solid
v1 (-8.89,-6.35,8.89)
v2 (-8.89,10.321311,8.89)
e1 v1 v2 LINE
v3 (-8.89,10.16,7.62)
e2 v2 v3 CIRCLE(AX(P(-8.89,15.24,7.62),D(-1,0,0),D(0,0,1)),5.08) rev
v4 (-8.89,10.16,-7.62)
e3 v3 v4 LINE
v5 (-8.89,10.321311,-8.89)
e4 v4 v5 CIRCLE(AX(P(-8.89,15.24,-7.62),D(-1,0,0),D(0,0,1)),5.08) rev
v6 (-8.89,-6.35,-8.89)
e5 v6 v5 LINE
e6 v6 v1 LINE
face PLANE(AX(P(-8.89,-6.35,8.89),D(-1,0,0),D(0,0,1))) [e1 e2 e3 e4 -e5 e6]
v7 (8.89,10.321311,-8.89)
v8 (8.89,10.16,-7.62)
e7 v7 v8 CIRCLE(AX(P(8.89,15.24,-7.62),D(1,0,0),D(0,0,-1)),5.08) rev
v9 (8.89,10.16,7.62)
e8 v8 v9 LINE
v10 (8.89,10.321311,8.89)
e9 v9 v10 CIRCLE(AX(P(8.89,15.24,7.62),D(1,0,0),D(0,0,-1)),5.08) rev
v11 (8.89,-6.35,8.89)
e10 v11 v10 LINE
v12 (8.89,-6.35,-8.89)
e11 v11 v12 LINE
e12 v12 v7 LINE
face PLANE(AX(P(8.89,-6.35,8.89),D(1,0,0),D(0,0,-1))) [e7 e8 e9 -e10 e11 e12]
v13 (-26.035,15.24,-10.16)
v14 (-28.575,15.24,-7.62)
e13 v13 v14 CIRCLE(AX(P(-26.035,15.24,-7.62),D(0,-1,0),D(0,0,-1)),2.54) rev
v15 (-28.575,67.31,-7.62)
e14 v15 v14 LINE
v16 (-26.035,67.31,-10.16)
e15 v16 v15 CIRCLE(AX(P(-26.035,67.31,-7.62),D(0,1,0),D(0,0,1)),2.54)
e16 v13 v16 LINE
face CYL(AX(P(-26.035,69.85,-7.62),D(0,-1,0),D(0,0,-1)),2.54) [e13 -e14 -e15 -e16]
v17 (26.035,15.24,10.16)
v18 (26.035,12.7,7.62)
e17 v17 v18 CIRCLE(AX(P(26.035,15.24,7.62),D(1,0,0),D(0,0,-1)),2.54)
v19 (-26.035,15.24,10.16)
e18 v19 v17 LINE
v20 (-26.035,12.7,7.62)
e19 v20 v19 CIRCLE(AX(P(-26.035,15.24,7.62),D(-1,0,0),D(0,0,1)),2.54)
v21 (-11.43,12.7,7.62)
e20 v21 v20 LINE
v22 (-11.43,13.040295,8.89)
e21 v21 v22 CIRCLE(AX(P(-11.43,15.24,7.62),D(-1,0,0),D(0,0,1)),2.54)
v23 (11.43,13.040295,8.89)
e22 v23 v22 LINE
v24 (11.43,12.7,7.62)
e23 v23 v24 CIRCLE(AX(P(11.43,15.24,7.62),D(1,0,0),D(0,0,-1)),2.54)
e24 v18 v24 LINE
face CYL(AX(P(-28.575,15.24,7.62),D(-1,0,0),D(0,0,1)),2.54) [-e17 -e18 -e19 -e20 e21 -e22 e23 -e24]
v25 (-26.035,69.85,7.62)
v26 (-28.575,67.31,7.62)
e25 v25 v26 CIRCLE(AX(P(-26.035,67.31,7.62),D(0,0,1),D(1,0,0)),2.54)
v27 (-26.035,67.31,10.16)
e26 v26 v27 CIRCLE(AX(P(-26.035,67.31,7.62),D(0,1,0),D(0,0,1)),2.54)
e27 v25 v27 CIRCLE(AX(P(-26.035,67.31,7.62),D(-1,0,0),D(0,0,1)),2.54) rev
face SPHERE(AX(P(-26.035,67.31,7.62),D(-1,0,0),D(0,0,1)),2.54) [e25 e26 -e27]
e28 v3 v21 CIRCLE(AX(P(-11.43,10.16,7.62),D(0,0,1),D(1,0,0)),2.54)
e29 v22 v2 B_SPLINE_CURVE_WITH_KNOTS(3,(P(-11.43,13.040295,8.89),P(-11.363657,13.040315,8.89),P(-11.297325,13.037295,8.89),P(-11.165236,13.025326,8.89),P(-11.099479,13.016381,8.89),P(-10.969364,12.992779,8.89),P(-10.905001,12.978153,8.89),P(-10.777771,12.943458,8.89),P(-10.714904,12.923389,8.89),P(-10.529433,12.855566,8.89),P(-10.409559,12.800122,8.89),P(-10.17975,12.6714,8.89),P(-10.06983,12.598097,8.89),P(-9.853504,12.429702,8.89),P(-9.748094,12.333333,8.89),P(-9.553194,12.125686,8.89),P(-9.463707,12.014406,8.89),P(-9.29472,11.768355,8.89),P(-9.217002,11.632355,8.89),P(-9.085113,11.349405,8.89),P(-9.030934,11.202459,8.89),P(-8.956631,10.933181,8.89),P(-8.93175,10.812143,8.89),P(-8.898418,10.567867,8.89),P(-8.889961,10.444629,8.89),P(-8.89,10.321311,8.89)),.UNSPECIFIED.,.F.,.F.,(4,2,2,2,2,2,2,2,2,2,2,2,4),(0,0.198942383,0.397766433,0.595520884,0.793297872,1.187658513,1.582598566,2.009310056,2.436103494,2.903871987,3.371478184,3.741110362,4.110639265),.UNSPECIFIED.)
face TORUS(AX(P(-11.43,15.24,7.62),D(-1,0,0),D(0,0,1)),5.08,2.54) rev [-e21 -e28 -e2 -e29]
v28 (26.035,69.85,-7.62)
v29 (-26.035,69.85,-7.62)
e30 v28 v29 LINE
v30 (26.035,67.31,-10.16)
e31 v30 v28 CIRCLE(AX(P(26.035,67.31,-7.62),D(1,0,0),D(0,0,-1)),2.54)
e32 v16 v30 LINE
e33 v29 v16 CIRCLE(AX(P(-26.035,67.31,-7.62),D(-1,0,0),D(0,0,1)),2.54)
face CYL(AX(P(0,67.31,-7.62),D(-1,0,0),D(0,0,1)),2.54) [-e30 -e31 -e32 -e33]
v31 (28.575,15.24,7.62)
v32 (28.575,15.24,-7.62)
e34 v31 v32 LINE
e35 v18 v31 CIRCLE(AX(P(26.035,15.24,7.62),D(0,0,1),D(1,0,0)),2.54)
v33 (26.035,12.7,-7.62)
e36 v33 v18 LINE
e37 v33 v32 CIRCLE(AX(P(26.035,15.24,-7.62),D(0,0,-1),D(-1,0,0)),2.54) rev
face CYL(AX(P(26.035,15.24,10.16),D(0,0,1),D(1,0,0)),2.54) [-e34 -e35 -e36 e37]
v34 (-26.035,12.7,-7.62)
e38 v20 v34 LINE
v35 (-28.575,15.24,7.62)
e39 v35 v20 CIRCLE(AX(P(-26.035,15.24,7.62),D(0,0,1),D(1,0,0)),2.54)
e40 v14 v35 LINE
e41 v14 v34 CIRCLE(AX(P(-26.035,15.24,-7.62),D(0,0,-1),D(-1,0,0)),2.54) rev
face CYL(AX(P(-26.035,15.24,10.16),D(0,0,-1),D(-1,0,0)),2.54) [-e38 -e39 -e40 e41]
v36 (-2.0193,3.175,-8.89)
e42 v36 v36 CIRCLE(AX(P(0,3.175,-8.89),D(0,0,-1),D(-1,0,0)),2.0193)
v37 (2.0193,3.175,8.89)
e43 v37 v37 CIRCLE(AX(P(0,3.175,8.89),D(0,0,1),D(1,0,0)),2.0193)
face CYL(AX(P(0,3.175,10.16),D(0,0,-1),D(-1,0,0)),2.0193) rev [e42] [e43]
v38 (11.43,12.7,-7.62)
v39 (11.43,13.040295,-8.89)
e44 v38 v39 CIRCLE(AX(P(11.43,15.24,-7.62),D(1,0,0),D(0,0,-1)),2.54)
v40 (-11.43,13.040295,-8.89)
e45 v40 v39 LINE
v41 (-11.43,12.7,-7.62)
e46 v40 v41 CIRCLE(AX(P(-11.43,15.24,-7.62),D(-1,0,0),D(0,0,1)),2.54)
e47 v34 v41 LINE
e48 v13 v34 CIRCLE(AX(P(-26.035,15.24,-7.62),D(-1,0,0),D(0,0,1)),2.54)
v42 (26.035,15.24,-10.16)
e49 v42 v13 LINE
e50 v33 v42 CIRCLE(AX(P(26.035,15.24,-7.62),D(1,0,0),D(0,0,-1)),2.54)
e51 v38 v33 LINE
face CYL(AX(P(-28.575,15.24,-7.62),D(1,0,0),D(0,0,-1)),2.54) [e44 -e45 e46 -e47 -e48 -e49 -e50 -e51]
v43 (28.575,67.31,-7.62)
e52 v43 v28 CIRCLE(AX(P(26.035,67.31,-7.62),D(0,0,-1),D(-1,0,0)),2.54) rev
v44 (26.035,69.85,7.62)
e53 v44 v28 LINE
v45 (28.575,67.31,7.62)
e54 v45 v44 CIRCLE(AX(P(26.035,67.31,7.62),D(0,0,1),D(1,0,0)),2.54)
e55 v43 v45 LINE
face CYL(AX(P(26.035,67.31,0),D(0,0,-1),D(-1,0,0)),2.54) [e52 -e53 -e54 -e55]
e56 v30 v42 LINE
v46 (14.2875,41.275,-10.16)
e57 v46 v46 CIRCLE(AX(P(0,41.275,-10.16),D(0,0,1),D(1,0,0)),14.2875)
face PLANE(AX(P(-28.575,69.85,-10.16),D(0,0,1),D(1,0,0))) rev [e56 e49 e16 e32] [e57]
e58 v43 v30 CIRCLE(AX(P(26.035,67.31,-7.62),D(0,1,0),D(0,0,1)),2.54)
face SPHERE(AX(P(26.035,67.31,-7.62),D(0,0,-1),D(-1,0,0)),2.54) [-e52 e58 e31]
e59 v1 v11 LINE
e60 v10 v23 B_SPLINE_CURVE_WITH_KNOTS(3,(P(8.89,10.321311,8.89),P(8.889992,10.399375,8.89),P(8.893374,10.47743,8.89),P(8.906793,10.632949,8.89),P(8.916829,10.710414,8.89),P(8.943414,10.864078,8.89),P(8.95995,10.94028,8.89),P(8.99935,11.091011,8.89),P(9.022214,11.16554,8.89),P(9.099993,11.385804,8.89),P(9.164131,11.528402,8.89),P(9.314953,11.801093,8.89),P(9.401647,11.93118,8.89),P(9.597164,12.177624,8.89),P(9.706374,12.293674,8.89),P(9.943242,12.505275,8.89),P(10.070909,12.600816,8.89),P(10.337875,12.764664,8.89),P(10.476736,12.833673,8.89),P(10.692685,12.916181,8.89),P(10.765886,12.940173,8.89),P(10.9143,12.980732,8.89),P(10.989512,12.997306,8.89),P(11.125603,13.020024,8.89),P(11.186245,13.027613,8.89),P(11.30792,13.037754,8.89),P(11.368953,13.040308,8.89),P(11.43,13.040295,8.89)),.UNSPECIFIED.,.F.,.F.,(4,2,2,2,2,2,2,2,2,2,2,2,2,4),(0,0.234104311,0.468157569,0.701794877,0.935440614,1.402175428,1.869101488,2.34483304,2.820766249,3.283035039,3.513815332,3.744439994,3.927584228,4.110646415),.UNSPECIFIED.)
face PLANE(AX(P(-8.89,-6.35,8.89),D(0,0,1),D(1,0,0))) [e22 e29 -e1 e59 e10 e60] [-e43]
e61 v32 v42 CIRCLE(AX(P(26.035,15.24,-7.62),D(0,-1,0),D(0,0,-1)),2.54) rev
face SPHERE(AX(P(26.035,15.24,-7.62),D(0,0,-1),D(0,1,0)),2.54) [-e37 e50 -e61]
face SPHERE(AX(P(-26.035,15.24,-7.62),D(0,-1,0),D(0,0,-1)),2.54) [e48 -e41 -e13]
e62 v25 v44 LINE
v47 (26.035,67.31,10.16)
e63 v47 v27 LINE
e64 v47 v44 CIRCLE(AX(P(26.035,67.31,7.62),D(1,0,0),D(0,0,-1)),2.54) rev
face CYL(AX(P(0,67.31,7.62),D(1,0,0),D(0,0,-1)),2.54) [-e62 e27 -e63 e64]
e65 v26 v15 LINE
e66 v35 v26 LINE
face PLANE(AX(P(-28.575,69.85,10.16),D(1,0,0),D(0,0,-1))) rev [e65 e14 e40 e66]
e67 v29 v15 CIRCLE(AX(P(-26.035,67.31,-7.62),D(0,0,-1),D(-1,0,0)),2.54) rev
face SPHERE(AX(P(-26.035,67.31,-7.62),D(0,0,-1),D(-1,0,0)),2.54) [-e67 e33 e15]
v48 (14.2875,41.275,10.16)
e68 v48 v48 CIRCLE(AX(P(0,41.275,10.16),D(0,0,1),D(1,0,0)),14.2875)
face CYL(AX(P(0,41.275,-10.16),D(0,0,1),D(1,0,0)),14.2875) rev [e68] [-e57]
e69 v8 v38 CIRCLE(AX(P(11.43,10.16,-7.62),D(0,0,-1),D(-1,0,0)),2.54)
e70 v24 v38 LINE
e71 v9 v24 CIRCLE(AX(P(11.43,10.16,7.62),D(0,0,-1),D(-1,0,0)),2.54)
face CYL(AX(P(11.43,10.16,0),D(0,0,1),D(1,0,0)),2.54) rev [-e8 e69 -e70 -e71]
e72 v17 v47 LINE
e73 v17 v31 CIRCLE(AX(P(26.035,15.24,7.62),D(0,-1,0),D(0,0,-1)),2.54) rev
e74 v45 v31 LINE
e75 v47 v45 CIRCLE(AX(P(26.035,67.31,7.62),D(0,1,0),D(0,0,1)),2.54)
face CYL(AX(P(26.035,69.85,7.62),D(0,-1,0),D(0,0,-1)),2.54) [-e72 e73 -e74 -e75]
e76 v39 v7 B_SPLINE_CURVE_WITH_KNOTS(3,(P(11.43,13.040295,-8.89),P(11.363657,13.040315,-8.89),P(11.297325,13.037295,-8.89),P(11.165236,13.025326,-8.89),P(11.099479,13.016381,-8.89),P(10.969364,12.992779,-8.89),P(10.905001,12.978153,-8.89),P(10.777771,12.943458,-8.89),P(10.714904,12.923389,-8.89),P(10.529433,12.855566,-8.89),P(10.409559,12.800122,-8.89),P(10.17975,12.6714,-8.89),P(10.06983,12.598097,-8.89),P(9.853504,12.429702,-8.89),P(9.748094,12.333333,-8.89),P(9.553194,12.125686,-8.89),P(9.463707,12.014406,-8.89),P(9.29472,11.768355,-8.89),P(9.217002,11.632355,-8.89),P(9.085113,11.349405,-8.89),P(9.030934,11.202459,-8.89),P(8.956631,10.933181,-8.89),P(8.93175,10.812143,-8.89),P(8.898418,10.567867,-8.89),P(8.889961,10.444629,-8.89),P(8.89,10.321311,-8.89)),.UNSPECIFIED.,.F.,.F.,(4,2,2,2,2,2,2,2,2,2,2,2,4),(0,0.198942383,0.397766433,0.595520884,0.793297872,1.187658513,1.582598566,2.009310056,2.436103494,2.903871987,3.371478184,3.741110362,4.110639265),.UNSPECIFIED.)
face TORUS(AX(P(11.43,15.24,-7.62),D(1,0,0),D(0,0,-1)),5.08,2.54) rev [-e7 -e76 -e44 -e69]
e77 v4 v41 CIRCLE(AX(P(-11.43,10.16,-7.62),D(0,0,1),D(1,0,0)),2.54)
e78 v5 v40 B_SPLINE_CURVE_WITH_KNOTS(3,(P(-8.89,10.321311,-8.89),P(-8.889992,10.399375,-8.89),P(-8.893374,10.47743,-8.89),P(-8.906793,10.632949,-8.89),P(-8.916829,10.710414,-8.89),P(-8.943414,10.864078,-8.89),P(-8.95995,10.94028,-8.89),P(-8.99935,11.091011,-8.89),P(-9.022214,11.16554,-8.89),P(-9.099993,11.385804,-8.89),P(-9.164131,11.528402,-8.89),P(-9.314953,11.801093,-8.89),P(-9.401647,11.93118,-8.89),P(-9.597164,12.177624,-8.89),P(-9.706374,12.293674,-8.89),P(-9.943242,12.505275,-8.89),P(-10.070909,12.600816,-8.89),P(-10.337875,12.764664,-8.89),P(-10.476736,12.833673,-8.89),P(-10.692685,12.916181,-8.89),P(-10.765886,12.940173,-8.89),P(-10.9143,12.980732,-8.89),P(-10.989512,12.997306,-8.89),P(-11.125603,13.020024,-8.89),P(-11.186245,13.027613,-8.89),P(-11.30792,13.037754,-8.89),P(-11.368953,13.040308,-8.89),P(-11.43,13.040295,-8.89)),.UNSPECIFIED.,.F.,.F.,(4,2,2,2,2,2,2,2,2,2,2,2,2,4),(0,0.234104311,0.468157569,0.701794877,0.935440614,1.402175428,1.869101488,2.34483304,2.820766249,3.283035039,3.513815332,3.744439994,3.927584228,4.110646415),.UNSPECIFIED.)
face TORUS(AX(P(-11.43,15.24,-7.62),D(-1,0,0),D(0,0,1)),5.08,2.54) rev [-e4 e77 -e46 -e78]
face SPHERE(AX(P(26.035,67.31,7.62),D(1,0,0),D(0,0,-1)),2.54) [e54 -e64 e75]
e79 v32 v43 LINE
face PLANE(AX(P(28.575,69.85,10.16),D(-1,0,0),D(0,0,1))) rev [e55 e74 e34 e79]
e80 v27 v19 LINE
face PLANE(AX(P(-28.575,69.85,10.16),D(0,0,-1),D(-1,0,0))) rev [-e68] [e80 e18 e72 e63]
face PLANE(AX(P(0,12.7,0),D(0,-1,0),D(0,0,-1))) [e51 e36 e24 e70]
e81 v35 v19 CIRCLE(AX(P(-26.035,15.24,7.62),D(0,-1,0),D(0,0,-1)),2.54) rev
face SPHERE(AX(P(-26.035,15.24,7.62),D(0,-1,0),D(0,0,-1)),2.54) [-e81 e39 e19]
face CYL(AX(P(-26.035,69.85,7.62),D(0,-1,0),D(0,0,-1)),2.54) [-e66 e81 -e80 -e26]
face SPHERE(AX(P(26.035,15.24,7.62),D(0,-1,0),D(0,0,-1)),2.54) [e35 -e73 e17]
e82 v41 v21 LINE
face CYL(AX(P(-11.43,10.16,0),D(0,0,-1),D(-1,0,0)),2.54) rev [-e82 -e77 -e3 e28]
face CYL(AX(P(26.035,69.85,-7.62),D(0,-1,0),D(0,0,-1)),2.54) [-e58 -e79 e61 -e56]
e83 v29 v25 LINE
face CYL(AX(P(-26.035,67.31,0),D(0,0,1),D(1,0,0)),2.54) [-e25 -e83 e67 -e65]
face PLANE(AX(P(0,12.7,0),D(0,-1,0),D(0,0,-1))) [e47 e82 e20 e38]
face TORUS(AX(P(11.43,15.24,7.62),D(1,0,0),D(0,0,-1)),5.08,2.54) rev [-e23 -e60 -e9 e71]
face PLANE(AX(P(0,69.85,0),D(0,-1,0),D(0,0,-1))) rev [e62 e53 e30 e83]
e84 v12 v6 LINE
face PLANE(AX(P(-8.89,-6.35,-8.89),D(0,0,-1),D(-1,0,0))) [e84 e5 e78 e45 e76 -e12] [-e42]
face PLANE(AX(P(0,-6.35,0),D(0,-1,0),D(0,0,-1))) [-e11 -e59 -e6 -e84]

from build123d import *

# Parameters (mm, degrees)
BOSS_EXTRUDE1_DEPTH      = 12.7
BOSS_EXTRUDE1_DEPTH_BACK = 6.35
SKETCH1_W                = 17.78
SKETCH1_H                = 17.78
SKETCH2_W                = 57.15
SKETCH2_H                = 20.32
BOSS_EXTRUDE2_DEPTH      = 57.15
SKETCH3_R                = 14.2875
CUT_EXTRUDE1_DEPTH       = 79.156608966
FILLET1_R                = 2.54
SKETCH4_R                = 2.0193
CUT_EXTRUDE2_DEPTH       = 78.836081768
FILLET2_R                = 2.54


with BuildPart() as part:
    # Sketch1 → Boss-Extrude1 (new, two sides: drawn at the far end of the back side and taken through both)
    with BuildSketch(Plane(origin=(0, 0, 0), x_dir=(1, 0, 0), z_dir=(0, 1, 0)).offset(-BOSS_EXTRUDE1_DEPTH_BACK)):
        Rectangle(SKETCH1_W, SKETCH1_H)
    extrude(amount=BOSS_EXTRUDE1_DEPTH + BOSS_EXTRUDE1_DEPTH_BACK)

    # Sketch2 → Boss-Extrude2 (add)
    with BuildSketch(Plane(origin=(0, 12.7, 0), x_dir=(1, 0, 0), z_dir=(0, 1, 0))):
        Rectangle(SKETCH2_W, SKETCH2_H)
    extrude(amount=BOSS_EXTRUDE2_DEPTH)

    # Sketch3 → Cut-Extrude1 (cut, through all)
    with BuildSketch(Plane.XY.offset(10.16)):
        with Locations((0, 41.275)):
            Circle(SKETCH3_R)
    extrude(amount=-CUT_EXTRUDE1_DEPTH, mode=Mode.SUBTRACT)

    # Fillet1
    # the kernel refuses this fillet: 2.54 mm, written as the material it takes off along each edge
    with BuildSketch(Plane(origin=(26.035, 67.31, 7.62), x_dir=(0, 1, 0), z_dir=(0, 0, 1))) as fillet1_piece_1_section:
        Polygon((0, 0), (FILLET1_R, 0), (FILLET1_R, -FILLET1_R), (0, -FILLET1_R), align=None)
    fillet1_piece_1 = extrude(amount=FILLET1_R, mode=Mode.PRIVATE)
    fillet1_piece_1 = fillet1_piece_1 - Plane(origin=(26.035, 67.31, 7.62), x_dir=(-0.7071067811865475, -0.7071067811865475, 0), z_dir=(0, 0, 1)) * Sphere(FILLET1_R, mode=Mode.PRIVATE)
    add(fillet1_piece_1, mode=Mode.SUBTRACT)
    with BuildSketch(Plane(origin=(26.035, 67.31, -7.62), x_dir=(1, 0, 0), z_dir=(0, 1, 0))) as fillet1_piece_2_section:
        Polygon((0, 0), (FILLET1_R, 0), (FILLET1_R, FILLET1_R), (0, FILLET1_R), align=None)
    fillet1_piece_2 = extrude(amount=FILLET1_R, mode=Mode.PRIVATE)
    fillet1_piece_2 = fillet1_piece_2 - Plane(origin=(26.035, 67.31, -7.62), x_dir=(-0.7071067811865475, 0, 0.7071067811865475), z_dir=(0, 1, 0)) * Sphere(FILLET1_R, mode=Mode.PRIVATE)
    add(fillet1_piece_2, mode=Mode.SUBTRACT)
    with BuildSketch(Plane(origin=(26.035, 15.24, 7.62), x_dir=(0, -1, 0), z_dir=(0, 0, 1))) as fillet1_piece_3_section:
        Polygon((0, 0), (FILLET1_R, 0), (FILLET1_R, FILLET1_R), (0, FILLET1_R), align=None)
    fillet1_piece_3 = extrude(amount=FILLET1_R, mode=Mode.PRIVATE)
    fillet1_piece_3 = fillet1_piece_3 - Plane(origin=(26.035, 15.24, 7.62), x_dir=(-0.7071067811865475, 0.7071067811865475, 0), z_dir=(0, 0, 1)) * Sphere(FILLET1_R, mode=Mode.PRIVATE)
    add(fillet1_piece_3, mode=Mode.SUBTRACT)
    with BuildSketch(Plane(origin=(26.035, 15.24, -7.62), x_dir=(1, 0, 0), z_dir=(0, -1, 0))) as fillet1_piece_4_section:
        Polygon((0, 0), (FILLET1_R, 0), (FILLET1_R, -FILLET1_R), (0, -FILLET1_R), align=None)
    fillet1_piece_4 = extrude(amount=FILLET1_R, mode=Mode.PRIVATE)
    fillet1_piece_4 = fillet1_piece_4 - Plane(origin=(26.035, 15.24, -7.62), x_dir=(-0.7071067811865475, 0, 0.7071067811865475), z_dir=(0, -1, 0)) * Sphere(FILLET1_R, mode=Mode.PRIVATE)
    add(fillet1_piece_4, mode=Mode.SUBTRACT)
    with BuildSketch(Plane(origin=(-26.035, 67.31, -7.62), x_dir=(0, 1, 0), z_dir=(-1, 0, 0))) as fillet1_piece_5_section:
        Polygon((0, 0), (FILLET1_R, 0), (FILLET1_R, FILLET1_R), (0, FILLET1_R), align=None)
    fillet1_piece_5 = extrude(amount=FILLET1_R, mode=Mode.PRIVATE)
    fillet1_piece_5 = fillet1_piece_5 - Plane(origin=(-26.035, 67.31, -7.62), x_dir=(0, -0.7071067811865475, 0.7071067811865475), z_dir=(-1, 0, 0)) * Sphere(FILLET1_R, mode=Mode.PRIVATE)
    add(fillet1_piece_5, mode=Mode.SUBTRACT)
    with BuildSketch(Plane(origin=(-26.035, 67.31, 7.62), x_dir=(-1, 0, 0), z_dir=(0, 0, 1))) as fillet1_piece_6_section:
        Polygon((0, 0), (FILLET1_R, 0), (FILLET1_R, -FILLET1_R), (0, -FILLET1_R), align=None)
    fillet1_piece_6 = extrude(amount=FILLET1_R, mode=Mode.PRIVATE)
    fillet1_piece_6 = fillet1_piece_6 - Plane(origin=(-26.035, 67.31, 7.62), x_dir=(0.7071067811865475, -0.7071067811865475, 0), z_dir=(0, 0, 1)) * Sphere(FILLET1_R, mode=Mode.PRIVATE)
    add(fillet1_piece_6, mode=Mode.SUBTRACT)
    with BuildSketch(Plane(origin=(-26.035, 15.24, -7.62), x_dir=(0, -1, 0), z_dir=(-1, 0, 0))) as fillet1_piece_7_section:
        Polygon((0, 0), (FILLET1_R, 0), (FILLET1_R, -FILLET1_R), (0, -FILLET1_R), align=None)
    fillet1_piece_7 = extrude(amount=FILLET1_R, mode=Mode.PRIVATE)
    fillet1_piece_7 = fillet1_piece_7 - Plane(origin=(-26.035, 15.24, -7.62), x_dir=(0, 0.7071067811865475, 0.7071067811865475), z_dir=(-1, 0, 0)) * Sphere(FILLET1_R, mode=Mode.PRIVATE)
    add(fillet1_piece_7, mode=Mode.SUBTRACT)
    with BuildSketch(Plane(origin=(-26.035, 15.24, 7.62), x_dir=(-1, 0, 0), z_dir=(0, 0, 1))) as fillet1_piece_8_section:
        Polygon((0, 0), (FILLET1_R, 0), (FILLET1_R, FILLET1_R), (0, FILLET1_R), align=None)
    fillet1_piece_8 = extrude(amount=FILLET1_R, mode=Mode.PRIVATE)
    fillet1_piece_8 = fillet1_piece_8 - Plane(origin=(-26.035, 15.24, 7.62), x_dir=(0.7071067811865475, 0.7071067811865475, 0), z_dir=(0, 0, 1)) * Sphere(FILLET1_R, mode=Mode.PRIVATE)
    add(fillet1_piece_8, mode=Mode.SUBTRACT)
    with BuildSketch(Plane(origin=(28.575, 69.85, 7.62), x_dir=(-1, 0, 0), z_dir=(0, 0, -1)), Plane(origin=(-28.575, 12.7, -7.62), x_dir=(0, 1, 0), z_dir=(0, 0, 1))) as fillet1_piece_9:
        with BuildLine():
            CenterArc((FILLET1_R, -FILLET1_R), FILLET1_R, 90, 90)
            Line((0, -FILLET1_R), (0, 0))
            Line((0, 0), (FILLET1_R, 0))
        make_face()
    extrude(amount=15.24, mode=Mode.SUBTRACT)
    with BuildSketch(Plane(origin=(28.575, 12.7, 7.62), x_dir=(-1, 0, 0), z_dir=(0, 0, -1)), Plane(origin=(-28.575, 69.85, -7.62), x_dir=(0, -1, 0), z_dir=(0, 0, 1))) as fillet1_piece_10:
        with BuildLine():
            CenterArc((FILLET1_R, FILLET1_R), FILLET1_R, 180, 90)
            Line((0, FILLET1_R), (0, 0))
            Line((0, 0), (FILLET1_R, 0))
        make_face()
    extrude(amount=15.24, mode=Mode.SUBTRACT)
    with BuildSketch(Plane(origin=(28.575, 15.24, -10.16), x_dir=(0, 0, 1), z_dir=(0, 1, 0)), Plane(origin=(26.035, 69.85, -10.16), x_dir=(0, 0, 1), z_dir=(-1, 0, 0)), Plane(origin=(28.575, 15.24, 10.16), x_dir=(-1, 0, 0), z_dir=(0, 1, 0))) as fillet1_piece_11:
        with BuildLine():
            CenterArc((FILLET1_R, -FILLET1_R), FILLET1_R, 90, 90)
            Line((0, -FILLET1_R), (0, 0))
            Line((0, 0), (FILLET1_R, 0))
        make_face()
    extrude(amount=52.07, mode=Mode.SUBTRACT)
    with BuildSketch(Plane(origin=(-28.575, 15.24, -10.16), x_dir=(0, 0, 1), z_dir=(0, 1, 0)), Plane(origin=(-28.575, 15.24, 10.16), x_dir=(1, 0, 0), z_dir=(0, 1, 0)), Plane(origin=(-26.035, 69.85, 10.16), x_dir=(0, -1, 0), z_dir=(1, 0, 0))) as fillet1_piece_12:
        with BuildLine():
            CenterArc((FILLET1_R, FILLET1_R), FILLET1_R, 180, 90)
            Line((0, FILLET1_R), (0, 0))
            Line((0, 0), (FILLET1_R, 0))
        make_face()
    extrude(amount=52.07, mode=Mode.SUBTRACT)
    with BuildSketch(Plane(origin=(26.035, 12.7, -10.16), x_dir=(0, 0, 1), z_dir=(-1, 0, 0))) as fillet1_piece_13_section:
        with BuildLine():
            CenterArc((FILLET1_R, FILLET1_R), FILLET1_R, 180, 90)
            Line((0, FILLET1_R), (0, 0))
            Line((0, 0), (FILLET1_R, 0))
        make_face()
    fillet1_piece_13 = extrude(amount=52.07, mode=Mode.PRIVATE)
    fillet1_piece_13 = split(fillet1_piece_13, bisect_by=Plane(origin=(8.89, 12.760981289, -8.475343007), z_dir=(1, 0, 0)), keep=Keep.TOP, mode=Mode.PRIVATE)
    fillet1_piece_13 = split(fillet1_piece_13, bisect_by=Plane(origin=(17.4625, 12.760981289, -8.89), z_dir=(0, 0, 1)), keep=Keep.TOP, mode=Mode.PRIVATE)
    add(fillet1_piece_13, mode=Mode.SUBTRACT)
    with BuildSketch(Plane(origin=(26.035, 12.7, -10.16), x_dir=(0, 0, 1), z_dir=(-1, 0, 0))) as fillet1_piece_14_section:
        with BuildLine():
            CenterArc((FILLET1_R, FILLET1_R), FILLET1_R, 180, 90)
            Line((0, FILLET1_R), (0, 0))
            Line((0, 0), (FILLET1_R, 0))
        make_face()
    fillet1_piece_14 = extrude(amount=52.07, mode=Mode.PRIVATE)
    fillet1_piece_14 = split(fillet1_piece_14, bisect_by=Plane(origin=(8.89, 13.348004952, -9.742444919), z_dir=(1, 0, 0)), keep=Keep.TOP, mode=Mode.PRIVATE)
    fillet1_piece_14 = split(fillet1_piece_14, bisect_by=Plane(origin=(17.4625, 13.348004952, -8.89), z_dir=(0, 0, -1)), keep=Keep.TOP, mode=Mode.PRIVATE)
    add(fillet1_piece_14, mode=Mode.SUBTRACT)
    with BuildSketch(Plane(origin=(26.035, 12.7, -10.16), x_dir=(0, 0, 1), z_dir=(-1, 0, 0))) as fillet1_piece_15_section:
        with BuildLine():
            CenterArc((FILLET1_R, FILLET1_R), FILLET1_R, 180, 90)
            Line((0, FILLET1_R), (0, 0))
            Line((0, 0), (FILLET1_R, 0))
        make_face()
    fillet1_piece_15 = extrude(amount=52.07, mode=Mode.PRIVATE)
    fillet1_piece_15 = split(fillet1_piece_15, bisect_by=Plane(origin=(8.89, 13.348004952, -9.742444919), z_dir=(-1, 0, 0)), keep=Keep.TOP, mode=Mode.PRIVATE)
    fillet1_piece_15 = split(fillet1_piece_15, bisect_by=Plane(origin=(0, 13.348004952, -8.89), z_dir=(0, 0, -1)), keep=Keep.TOP, mode=Mode.PRIVATE)
    fillet1_piece_15 = split(fillet1_piece_15, bisect_by=Plane(origin=(-8.89, 13.348004952, -9.742444919), z_dir=(1, 0, 0)), keep=Keep.TOP, mode=Mode.PRIVATE)
    add(fillet1_piece_15, mode=Mode.SUBTRACT)
    with BuildSketch(Plane(origin=(26.035, 12.7, -10.16), x_dir=(0, 0, 1), z_dir=(-1, 0, 0))) as fillet1_piece_16_section:
        with BuildLine():
            CenterArc((FILLET1_R, FILLET1_R), FILLET1_R, 180, 90)
            Line((0, FILLET1_R), (0, 0))
            Line((0, 0), (FILLET1_R, 0))
        make_face()
    fillet1_piece_16 = extrude(amount=52.07, mode=Mode.PRIVATE)
    fillet1_piece_16 = split(fillet1_piece_16, bisect_by=Plane(origin=(-17.4625, 12.760981289, -8.89), z_dir=(0, 0, 1)), keep=Keep.TOP, mode=Mode.PRIVATE)
    fillet1_piece_16 = split(fillet1_piece_16, bisect_by=Plane(origin=(-8.89, 12.760981289, -8.475343007), z_dir=(-1, 0, 0)), keep=Keep.TOP, mode=Mode.PRIVATE)
    add(fillet1_piece_16, mode=Mode.SUBTRACT)
    with BuildSketch(Plane(origin=(26.035, 12.7, -10.16), x_dir=(0, 0, 1), z_dir=(-1, 0, 0))) as fillet1_piece_17_section:
        with BuildLine():
            CenterArc((FILLET1_R, FILLET1_R), FILLET1_R, 180, 90)
            Line((0, FILLET1_R), (0, 0))
            Line((0, 0), (FILLET1_R, 0))
        make_face()
    fillet1_piece_17 = extrude(amount=52.07, mode=Mode.PRIVATE)
    fillet1_piece_17 = split(fillet1_piece_17, bisect_by=Plane(origin=(-17.4625, 13.348004952, -8.89), z_dir=(0, 0, -1)), keep=Keep.TOP, mode=Mode.PRIVATE)
    fillet1_piece_17 = split(fillet1_piece_17, bisect_by=Plane(origin=(-8.89, 13.348004952, -9.742444919), z_dir=(-1, 0, 0)), keep=Keep.TOP, mode=Mode.PRIVATE)
    add(fillet1_piece_17, mode=Mode.SUBTRACT)
    with BuildSketch(Plane(origin=(-26.035, 12.7, 10.16), x_dir=(0, 1, 0), z_dir=(1, 0, 0))) as fillet1_piece_18_section:
        with BuildLine():
            CenterArc((FILLET1_R, -FILLET1_R), FILLET1_R, 90, 90)
            Line((0, -FILLET1_R), (0, 0))
            Line((0, 0), (FILLET1_R, 0))
        make_face()
    fillet1_piece_18 = extrude(amount=52.07, mode=Mode.PRIVATE)
    fillet1_piece_18 = split(fillet1_piece_18, bisect_by=Plane(origin=(-17.4625, 13.348004952, 8.89), z_dir=(0, 0, 1)), keep=Keep.TOP, mode=Mode.PRIVATE)
    fillet1_piece_18 = split(fillet1_piece_18, bisect_by=Plane(origin=(-8.89, 13.348004952, 9.742444919), z_dir=(-1, 0, 0)), keep=Keep.TOP, mode=Mode.PRIVATE)
    add(fillet1_piece_18, mode=Mode.SUBTRACT)
    with BuildSketch(Plane(origin=(-26.035, 12.7, 10.16), x_dir=(0, 1, 0), z_dir=(1, 0, 0))) as fillet1_piece_19_section:
        with BuildLine():
            CenterArc((FILLET1_R, -FILLET1_R), FILLET1_R, 90, 90)
            Line((0, -FILLET1_R), (0, 0))
            Line((0, 0), (FILLET1_R, 0))
        make_face()
    fillet1_piece_19 = extrude(amount=52.07, mode=Mode.PRIVATE)
    fillet1_piece_19 = split(fillet1_piece_19, bisect_by=Plane(origin=(-17.4625, 12.760981289, 8.89), z_dir=(0, 0, -1)), keep=Keep.TOP, mode=Mode.PRIVATE)
    fillet1_piece_19 = split(fillet1_piece_19, bisect_by=Plane(origin=(-8.89, 12.760981289, 8.475343007), z_dir=(-1, 0, 0)), keep=Keep.TOP, mode=Mode.PRIVATE)
    add(fillet1_piece_19, mode=Mode.SUBTRACT)
    with BuildSketch(Plane(origin=(-26.035, 12.7, 10.16), x_dir=(0, 1, 0), z_dir=(1, 0, 0))) as fillet1_piece_20_section:
        with BuildLine():
            CenterArc((FILLET1_R, -FILLET1_R), FILLET1_R, 90, 90)
            Line((0, -FILLET1_R), (0, 0))
            Line((0, 0), (FILLET1_R, 0))
        make_face()
    fillet1_piece_20 = extrude(amount=52.07, mode=Mode.PRIVATE)
    fillet1_piece_20 = split(fillet1_piece_20, bisect_by=Plane(origin=(0, 13.348004952, 8.89), z_dir=(0, 0, 1)), keep=Keep.TOP, mode=Mode.PRIVATE)
    fillet1_piece_20 = split(fillet1_piece_20, bisect_by=Plane(origin=(8.89, 13.348004952, 9.742444919), z_dir=(-1, 0, 0)), keep=Keep.TOP, mode=Mode.PRIVATE)
    fillet1_piece_20 = split(fillet1_piece_20, bisect_by=Plane(origin=(-8.89, 13.348004952, 9.742444919), z_dir=(1, 0, 0)), keep=Keep.TOP, mode=Mode.PRIVATE)
    add(fillet1_piece_20, mode=Mode.SUBTRACT)
    with BuildSketch(Plane(origin=(-26.035, 12.7, 10.16), x_dir=(0, 1, 0), z_dir=(1, 0, 0))) as fillet1_piece_21_section:
        with BuildLine():
            CenterArc((FILLET1_R, -FILLET1_R), FILLET1_R, 90, 90)
            Line((0, -FILLET1_R), (0, 0))
            Line((0, 0), (FILLET1_R, 0))
        make_face()
    fillet1_piece_21 = extrude(amount=52.07, mode=Mode.PRIVATE)
    fillet1_piece_21 = split(fillet1_piece_21, bisect_by=Plane(origin=(17.4625, 13.348004952, 8.89), z_dir=(0, 0, 1)), keep=Keep.TOP, mode=Mode.PRIVATE)
    fillet1_piece_21 = split(fillet1_piece_21, bisect_by=Plane(origin=(8.89, 13.348004952, 9.742444919), z_dir=(1, 0, 0)), keep=Keep.TOP, mode=Mode.PRIVATE)
    add(fillet1_piece_21, mode=Mode.SUBTRACT)
    with BuildSketch(Plane(origin=(-26.035, 12.7, 10.16), x_dir=(0, 1, 0), z_dir=(1, 0, 0))) as fillet1_piece_22_section:
        with BuildLine():
            CenterArc((FILLET1_R, -FILLET1_R), FILLET1_R, 90, 90)
            Line((0, -FILLET1_R), (0, 0))
            Line((0, 0), (FILLET1_R, 0))
        make_face()
    fillet1_piece_22 = extrude(amount=52.07, mode=Mode.PRIVATE)
    fillet1_piece_22 = split(fillet1_piece_22, bisect_by=Plane(origin=(17.4625, 12.760981289, 8.89), z_dir=(0, 0, -1)), keep=Keep.TOP, mode=Mode.PRIVATE)
    fillet1_piece_22 = split(fillet1_piece_22, bisect_by=Plane(origin=(8.89, 12.760981289, 8.475343007), z_dir=(1, 0, 0)), keep=Keep.TOP, mode=Mode.PRIVATE)
    add(fillet1_piece_22, mode=Mode.SUBTRACT)

    # Sketch4 → Cut-Extrude2 (cut, through all)
    with BuildSketch(Plane(origin=(0, 0, -8.89), x_dir=(-1, 0, 0), z_dir=(0, 0, -1))):
        with Locations((0, 3.175)):
            Circle(SKETCH4_R)
    extrude(amount=-CUT_EXTRUDE2_DEPTH, mode=Mode.SUBTRACT)

    # Fillet2
    fillet2_edges = [part.edges().sort_by_distance(p)[0] for p in [
        (8.89, 12.7, 0),
        (-8.89, 12.7, 0),
        (-8.89, 12.786548401, -8.277400375),
        (8.89, 12.786548401, -8.277400375),
        (8.89, 12.786548401, 8.277400375),
        (-8.89, 12.786548401, 8.277400375),
    ]]
    fillet(fillet2_edges, radius=FILLET2_R)


solid = part.part
